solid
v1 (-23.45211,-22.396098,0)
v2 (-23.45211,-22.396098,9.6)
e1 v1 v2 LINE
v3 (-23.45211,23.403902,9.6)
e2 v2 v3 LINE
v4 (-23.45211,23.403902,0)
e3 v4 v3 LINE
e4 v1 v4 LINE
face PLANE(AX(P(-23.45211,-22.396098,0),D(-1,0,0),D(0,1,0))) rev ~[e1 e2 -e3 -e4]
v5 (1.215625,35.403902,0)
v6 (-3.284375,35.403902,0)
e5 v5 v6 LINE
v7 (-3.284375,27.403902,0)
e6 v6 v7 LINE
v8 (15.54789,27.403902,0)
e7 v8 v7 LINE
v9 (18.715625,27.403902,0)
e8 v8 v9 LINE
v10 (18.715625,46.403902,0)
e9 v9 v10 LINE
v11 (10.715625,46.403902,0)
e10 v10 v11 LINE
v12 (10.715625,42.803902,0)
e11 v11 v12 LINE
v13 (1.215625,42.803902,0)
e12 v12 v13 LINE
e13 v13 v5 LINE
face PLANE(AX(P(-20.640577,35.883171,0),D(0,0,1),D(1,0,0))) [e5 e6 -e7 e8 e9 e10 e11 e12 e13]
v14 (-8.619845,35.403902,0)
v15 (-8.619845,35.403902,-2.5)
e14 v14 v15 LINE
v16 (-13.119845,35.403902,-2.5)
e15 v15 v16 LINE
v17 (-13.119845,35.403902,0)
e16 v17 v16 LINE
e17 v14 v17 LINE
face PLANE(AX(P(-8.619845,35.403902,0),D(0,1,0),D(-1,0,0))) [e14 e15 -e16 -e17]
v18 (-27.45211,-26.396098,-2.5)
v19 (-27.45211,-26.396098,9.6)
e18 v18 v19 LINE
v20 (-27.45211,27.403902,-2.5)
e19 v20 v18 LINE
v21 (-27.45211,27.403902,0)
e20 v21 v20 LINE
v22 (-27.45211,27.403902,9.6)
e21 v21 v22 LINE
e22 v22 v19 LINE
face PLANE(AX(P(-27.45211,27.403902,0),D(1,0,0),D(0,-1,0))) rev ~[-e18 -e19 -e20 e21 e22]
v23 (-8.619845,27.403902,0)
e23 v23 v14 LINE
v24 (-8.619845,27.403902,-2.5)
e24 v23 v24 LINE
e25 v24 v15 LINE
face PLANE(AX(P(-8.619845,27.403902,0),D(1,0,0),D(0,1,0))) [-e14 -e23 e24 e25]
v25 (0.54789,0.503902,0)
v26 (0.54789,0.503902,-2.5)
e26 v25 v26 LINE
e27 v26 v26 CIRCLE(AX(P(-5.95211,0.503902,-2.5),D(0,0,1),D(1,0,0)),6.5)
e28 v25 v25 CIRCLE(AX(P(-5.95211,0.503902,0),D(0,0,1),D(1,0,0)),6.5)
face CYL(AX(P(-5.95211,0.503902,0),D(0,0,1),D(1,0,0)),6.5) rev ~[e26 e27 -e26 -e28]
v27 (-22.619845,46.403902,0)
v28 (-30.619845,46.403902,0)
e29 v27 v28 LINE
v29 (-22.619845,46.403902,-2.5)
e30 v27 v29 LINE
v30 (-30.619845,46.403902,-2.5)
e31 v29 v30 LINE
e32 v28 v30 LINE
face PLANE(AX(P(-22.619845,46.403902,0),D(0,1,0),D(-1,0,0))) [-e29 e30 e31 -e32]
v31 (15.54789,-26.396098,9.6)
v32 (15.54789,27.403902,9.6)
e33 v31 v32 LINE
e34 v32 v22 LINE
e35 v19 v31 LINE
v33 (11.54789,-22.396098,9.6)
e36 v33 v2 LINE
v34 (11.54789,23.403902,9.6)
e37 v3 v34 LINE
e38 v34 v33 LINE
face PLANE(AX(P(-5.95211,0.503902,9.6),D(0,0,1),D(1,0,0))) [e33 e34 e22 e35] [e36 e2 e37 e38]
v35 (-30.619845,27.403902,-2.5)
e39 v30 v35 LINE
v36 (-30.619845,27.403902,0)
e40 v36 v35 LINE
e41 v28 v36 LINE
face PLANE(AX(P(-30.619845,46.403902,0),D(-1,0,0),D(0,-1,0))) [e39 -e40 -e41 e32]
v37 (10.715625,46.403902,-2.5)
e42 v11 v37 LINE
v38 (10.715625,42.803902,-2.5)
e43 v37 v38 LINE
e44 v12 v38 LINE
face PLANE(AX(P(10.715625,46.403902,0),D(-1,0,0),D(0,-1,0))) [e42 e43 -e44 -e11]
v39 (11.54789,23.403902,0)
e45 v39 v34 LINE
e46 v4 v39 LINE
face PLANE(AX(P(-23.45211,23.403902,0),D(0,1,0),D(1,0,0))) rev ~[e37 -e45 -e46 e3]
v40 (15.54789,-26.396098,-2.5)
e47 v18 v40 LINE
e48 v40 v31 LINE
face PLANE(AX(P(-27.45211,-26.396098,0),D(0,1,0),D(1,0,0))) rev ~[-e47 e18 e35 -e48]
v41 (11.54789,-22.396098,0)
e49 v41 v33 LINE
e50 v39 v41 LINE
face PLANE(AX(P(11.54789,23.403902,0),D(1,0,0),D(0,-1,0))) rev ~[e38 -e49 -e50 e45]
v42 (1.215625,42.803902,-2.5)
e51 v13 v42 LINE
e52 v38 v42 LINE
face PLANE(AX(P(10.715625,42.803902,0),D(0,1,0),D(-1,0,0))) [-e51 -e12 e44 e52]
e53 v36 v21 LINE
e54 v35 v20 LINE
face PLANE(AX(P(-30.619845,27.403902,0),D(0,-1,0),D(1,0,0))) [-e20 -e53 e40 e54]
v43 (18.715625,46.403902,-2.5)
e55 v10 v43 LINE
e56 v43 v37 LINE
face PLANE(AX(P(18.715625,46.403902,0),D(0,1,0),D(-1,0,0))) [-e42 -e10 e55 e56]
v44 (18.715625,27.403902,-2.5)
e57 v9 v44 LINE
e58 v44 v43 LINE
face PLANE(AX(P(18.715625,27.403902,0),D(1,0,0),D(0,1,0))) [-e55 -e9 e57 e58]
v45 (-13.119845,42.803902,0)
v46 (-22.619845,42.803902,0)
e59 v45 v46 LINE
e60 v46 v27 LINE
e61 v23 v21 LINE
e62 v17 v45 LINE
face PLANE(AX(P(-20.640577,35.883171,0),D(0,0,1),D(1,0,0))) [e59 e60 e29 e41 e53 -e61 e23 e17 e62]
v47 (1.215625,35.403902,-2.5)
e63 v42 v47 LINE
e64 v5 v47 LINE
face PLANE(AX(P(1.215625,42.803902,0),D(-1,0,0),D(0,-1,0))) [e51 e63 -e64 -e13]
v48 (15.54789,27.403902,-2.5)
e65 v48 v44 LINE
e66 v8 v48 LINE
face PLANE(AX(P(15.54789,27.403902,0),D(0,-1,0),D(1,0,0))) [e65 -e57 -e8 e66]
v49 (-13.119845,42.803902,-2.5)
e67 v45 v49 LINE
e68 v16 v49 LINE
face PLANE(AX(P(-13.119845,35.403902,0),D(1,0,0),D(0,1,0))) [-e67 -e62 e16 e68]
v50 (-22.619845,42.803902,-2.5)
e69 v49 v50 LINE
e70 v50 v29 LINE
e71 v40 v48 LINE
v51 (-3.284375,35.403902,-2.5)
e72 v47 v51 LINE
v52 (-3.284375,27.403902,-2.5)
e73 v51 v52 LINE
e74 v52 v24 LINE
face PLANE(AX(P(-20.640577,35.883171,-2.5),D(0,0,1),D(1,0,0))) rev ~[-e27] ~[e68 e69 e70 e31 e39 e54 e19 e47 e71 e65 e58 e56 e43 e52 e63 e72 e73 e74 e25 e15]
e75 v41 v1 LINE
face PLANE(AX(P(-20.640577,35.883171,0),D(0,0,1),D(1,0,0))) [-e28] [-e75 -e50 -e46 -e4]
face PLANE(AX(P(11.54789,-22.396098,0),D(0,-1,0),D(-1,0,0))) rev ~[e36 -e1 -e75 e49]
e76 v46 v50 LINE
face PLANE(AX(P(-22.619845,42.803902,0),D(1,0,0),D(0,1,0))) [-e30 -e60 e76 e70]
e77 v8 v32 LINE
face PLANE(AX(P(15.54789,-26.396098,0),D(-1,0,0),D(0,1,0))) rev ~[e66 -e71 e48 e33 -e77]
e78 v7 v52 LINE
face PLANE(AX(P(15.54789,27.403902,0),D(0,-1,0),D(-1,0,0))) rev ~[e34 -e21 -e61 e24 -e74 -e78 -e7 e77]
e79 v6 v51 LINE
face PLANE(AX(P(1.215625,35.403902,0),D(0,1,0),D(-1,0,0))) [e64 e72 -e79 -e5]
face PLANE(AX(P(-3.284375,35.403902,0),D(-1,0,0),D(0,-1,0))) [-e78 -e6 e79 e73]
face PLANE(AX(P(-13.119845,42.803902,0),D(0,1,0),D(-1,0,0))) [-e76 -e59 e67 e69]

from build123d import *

# Parameters (mm, degrees)
F0_R     = 6.5
F1_DEPTH = 2.5
F3_DEPTH = 9.6


# Not quite as in the source:
# - a feature of the source that left no trace in its solid (it failed there, or was rolled back) is left out


with BuildPart() as f1:
    # F0 (on Top) → F1 (new body)
    with BuildSketch(Plane.XY):
        Polygon((-30.6198447943, 27.4039022624), (-27.4521095872, 27.4039022624), (-8.6198447943, 27.4039022624), (-8.6198447943, 35.4039022624), (-13.1198447943, 35.4039022624), (-13.1198447943, 42.8039022624), (-22.6198447943, 42.8039022624), (-22.6198447943, 46.4039022624), (-30.6198447943, 46.4039022624), align=None)
        Polygon((-3.2843746781, 35.4039022624), (-3.2843746781, 27.4039022624), (15.5478901148, 27.4039022624), (18.7156253219, 27.4039022624), (18.7156253219, 46.4039022624), (10.7156253219, 46.4039022624), (10.7156253219, 42.8039022624), (1.2156253219, 42.8039022624), (1.2156253219, 35.4039022624), align=None)
        Polygon((-8.6198447943, 27.4039022624), (-27.4521095872, 27.4039022624), (-27.4521095872, -26.3960977376), (-6.0521095872, -26.3960977376), (-5.8521098852, -26.3960977376), (15.5478901148, -26.3960977376), (15.5478901148, 27.4039022624), (-3.2843746781, 27.4039022624), (-5.8521098852, 27.4039022624), (-6.0521095872, 27.4039022624), align=None)
        Polygon((-23.4521095872, -22.3960977376), (-23.4521095872, 23.4039022624), (-5.9521097362, 23.4039022624), (11.5478901148, 23.4039022624), (11.5478901148, -22.3960977376), (-5.9521097362, -22.3960977376), align=None, mode=Mode.SUBTRACT)
        Polygon((-5.9521097362, 23.4039022624), (-23.4521095872, 23.4039022624), (-23.4521095872, -22.3960977376), (-5.9521097362, -22.3960977376), (11.5478901148, -22.3960977376), (11.5478901148, 23.4039022624), align=None)
        with Locations((-5.9521097362, 0.5039022624)):
            Circle(F0_R, mode=Mode.SUBTRACT)
    extrude(amount=-F1_DEPTH)

    # F0 (on Top) → F3 (join)
    with BuildSketch(Plane.XY):
        Polygon((-8.6198447943, 27.4039022624), (-27.4521095872, 27.4039022624), (-27.4521095872, -26.3960977376), (-6.0521095872, -26.3960977376), (-5.8521098852, -26.3960977376), (15.5478901148, -26.3960977376), (15.5478901148, 27.4039022624), (-3.2843746781, 27.4039022624), (-5.8521098852, 27.4039022624), (-6.0521095872, 27.4039022624), align=None)
        Polygon((-23.4521095872, -22.3960977376), (-23.4521095872, 23.4039022624), (-5.9521097362, 23.4039022624), (11.5478901148, 23.4039022624), (11.5478901148, -22.3960977376), (-5.9521097362, -22.3960977376), align=None, mode=Mode.SUBTRACT)
    extrude(amount=F3_DEPTH)


solid = f1.part
